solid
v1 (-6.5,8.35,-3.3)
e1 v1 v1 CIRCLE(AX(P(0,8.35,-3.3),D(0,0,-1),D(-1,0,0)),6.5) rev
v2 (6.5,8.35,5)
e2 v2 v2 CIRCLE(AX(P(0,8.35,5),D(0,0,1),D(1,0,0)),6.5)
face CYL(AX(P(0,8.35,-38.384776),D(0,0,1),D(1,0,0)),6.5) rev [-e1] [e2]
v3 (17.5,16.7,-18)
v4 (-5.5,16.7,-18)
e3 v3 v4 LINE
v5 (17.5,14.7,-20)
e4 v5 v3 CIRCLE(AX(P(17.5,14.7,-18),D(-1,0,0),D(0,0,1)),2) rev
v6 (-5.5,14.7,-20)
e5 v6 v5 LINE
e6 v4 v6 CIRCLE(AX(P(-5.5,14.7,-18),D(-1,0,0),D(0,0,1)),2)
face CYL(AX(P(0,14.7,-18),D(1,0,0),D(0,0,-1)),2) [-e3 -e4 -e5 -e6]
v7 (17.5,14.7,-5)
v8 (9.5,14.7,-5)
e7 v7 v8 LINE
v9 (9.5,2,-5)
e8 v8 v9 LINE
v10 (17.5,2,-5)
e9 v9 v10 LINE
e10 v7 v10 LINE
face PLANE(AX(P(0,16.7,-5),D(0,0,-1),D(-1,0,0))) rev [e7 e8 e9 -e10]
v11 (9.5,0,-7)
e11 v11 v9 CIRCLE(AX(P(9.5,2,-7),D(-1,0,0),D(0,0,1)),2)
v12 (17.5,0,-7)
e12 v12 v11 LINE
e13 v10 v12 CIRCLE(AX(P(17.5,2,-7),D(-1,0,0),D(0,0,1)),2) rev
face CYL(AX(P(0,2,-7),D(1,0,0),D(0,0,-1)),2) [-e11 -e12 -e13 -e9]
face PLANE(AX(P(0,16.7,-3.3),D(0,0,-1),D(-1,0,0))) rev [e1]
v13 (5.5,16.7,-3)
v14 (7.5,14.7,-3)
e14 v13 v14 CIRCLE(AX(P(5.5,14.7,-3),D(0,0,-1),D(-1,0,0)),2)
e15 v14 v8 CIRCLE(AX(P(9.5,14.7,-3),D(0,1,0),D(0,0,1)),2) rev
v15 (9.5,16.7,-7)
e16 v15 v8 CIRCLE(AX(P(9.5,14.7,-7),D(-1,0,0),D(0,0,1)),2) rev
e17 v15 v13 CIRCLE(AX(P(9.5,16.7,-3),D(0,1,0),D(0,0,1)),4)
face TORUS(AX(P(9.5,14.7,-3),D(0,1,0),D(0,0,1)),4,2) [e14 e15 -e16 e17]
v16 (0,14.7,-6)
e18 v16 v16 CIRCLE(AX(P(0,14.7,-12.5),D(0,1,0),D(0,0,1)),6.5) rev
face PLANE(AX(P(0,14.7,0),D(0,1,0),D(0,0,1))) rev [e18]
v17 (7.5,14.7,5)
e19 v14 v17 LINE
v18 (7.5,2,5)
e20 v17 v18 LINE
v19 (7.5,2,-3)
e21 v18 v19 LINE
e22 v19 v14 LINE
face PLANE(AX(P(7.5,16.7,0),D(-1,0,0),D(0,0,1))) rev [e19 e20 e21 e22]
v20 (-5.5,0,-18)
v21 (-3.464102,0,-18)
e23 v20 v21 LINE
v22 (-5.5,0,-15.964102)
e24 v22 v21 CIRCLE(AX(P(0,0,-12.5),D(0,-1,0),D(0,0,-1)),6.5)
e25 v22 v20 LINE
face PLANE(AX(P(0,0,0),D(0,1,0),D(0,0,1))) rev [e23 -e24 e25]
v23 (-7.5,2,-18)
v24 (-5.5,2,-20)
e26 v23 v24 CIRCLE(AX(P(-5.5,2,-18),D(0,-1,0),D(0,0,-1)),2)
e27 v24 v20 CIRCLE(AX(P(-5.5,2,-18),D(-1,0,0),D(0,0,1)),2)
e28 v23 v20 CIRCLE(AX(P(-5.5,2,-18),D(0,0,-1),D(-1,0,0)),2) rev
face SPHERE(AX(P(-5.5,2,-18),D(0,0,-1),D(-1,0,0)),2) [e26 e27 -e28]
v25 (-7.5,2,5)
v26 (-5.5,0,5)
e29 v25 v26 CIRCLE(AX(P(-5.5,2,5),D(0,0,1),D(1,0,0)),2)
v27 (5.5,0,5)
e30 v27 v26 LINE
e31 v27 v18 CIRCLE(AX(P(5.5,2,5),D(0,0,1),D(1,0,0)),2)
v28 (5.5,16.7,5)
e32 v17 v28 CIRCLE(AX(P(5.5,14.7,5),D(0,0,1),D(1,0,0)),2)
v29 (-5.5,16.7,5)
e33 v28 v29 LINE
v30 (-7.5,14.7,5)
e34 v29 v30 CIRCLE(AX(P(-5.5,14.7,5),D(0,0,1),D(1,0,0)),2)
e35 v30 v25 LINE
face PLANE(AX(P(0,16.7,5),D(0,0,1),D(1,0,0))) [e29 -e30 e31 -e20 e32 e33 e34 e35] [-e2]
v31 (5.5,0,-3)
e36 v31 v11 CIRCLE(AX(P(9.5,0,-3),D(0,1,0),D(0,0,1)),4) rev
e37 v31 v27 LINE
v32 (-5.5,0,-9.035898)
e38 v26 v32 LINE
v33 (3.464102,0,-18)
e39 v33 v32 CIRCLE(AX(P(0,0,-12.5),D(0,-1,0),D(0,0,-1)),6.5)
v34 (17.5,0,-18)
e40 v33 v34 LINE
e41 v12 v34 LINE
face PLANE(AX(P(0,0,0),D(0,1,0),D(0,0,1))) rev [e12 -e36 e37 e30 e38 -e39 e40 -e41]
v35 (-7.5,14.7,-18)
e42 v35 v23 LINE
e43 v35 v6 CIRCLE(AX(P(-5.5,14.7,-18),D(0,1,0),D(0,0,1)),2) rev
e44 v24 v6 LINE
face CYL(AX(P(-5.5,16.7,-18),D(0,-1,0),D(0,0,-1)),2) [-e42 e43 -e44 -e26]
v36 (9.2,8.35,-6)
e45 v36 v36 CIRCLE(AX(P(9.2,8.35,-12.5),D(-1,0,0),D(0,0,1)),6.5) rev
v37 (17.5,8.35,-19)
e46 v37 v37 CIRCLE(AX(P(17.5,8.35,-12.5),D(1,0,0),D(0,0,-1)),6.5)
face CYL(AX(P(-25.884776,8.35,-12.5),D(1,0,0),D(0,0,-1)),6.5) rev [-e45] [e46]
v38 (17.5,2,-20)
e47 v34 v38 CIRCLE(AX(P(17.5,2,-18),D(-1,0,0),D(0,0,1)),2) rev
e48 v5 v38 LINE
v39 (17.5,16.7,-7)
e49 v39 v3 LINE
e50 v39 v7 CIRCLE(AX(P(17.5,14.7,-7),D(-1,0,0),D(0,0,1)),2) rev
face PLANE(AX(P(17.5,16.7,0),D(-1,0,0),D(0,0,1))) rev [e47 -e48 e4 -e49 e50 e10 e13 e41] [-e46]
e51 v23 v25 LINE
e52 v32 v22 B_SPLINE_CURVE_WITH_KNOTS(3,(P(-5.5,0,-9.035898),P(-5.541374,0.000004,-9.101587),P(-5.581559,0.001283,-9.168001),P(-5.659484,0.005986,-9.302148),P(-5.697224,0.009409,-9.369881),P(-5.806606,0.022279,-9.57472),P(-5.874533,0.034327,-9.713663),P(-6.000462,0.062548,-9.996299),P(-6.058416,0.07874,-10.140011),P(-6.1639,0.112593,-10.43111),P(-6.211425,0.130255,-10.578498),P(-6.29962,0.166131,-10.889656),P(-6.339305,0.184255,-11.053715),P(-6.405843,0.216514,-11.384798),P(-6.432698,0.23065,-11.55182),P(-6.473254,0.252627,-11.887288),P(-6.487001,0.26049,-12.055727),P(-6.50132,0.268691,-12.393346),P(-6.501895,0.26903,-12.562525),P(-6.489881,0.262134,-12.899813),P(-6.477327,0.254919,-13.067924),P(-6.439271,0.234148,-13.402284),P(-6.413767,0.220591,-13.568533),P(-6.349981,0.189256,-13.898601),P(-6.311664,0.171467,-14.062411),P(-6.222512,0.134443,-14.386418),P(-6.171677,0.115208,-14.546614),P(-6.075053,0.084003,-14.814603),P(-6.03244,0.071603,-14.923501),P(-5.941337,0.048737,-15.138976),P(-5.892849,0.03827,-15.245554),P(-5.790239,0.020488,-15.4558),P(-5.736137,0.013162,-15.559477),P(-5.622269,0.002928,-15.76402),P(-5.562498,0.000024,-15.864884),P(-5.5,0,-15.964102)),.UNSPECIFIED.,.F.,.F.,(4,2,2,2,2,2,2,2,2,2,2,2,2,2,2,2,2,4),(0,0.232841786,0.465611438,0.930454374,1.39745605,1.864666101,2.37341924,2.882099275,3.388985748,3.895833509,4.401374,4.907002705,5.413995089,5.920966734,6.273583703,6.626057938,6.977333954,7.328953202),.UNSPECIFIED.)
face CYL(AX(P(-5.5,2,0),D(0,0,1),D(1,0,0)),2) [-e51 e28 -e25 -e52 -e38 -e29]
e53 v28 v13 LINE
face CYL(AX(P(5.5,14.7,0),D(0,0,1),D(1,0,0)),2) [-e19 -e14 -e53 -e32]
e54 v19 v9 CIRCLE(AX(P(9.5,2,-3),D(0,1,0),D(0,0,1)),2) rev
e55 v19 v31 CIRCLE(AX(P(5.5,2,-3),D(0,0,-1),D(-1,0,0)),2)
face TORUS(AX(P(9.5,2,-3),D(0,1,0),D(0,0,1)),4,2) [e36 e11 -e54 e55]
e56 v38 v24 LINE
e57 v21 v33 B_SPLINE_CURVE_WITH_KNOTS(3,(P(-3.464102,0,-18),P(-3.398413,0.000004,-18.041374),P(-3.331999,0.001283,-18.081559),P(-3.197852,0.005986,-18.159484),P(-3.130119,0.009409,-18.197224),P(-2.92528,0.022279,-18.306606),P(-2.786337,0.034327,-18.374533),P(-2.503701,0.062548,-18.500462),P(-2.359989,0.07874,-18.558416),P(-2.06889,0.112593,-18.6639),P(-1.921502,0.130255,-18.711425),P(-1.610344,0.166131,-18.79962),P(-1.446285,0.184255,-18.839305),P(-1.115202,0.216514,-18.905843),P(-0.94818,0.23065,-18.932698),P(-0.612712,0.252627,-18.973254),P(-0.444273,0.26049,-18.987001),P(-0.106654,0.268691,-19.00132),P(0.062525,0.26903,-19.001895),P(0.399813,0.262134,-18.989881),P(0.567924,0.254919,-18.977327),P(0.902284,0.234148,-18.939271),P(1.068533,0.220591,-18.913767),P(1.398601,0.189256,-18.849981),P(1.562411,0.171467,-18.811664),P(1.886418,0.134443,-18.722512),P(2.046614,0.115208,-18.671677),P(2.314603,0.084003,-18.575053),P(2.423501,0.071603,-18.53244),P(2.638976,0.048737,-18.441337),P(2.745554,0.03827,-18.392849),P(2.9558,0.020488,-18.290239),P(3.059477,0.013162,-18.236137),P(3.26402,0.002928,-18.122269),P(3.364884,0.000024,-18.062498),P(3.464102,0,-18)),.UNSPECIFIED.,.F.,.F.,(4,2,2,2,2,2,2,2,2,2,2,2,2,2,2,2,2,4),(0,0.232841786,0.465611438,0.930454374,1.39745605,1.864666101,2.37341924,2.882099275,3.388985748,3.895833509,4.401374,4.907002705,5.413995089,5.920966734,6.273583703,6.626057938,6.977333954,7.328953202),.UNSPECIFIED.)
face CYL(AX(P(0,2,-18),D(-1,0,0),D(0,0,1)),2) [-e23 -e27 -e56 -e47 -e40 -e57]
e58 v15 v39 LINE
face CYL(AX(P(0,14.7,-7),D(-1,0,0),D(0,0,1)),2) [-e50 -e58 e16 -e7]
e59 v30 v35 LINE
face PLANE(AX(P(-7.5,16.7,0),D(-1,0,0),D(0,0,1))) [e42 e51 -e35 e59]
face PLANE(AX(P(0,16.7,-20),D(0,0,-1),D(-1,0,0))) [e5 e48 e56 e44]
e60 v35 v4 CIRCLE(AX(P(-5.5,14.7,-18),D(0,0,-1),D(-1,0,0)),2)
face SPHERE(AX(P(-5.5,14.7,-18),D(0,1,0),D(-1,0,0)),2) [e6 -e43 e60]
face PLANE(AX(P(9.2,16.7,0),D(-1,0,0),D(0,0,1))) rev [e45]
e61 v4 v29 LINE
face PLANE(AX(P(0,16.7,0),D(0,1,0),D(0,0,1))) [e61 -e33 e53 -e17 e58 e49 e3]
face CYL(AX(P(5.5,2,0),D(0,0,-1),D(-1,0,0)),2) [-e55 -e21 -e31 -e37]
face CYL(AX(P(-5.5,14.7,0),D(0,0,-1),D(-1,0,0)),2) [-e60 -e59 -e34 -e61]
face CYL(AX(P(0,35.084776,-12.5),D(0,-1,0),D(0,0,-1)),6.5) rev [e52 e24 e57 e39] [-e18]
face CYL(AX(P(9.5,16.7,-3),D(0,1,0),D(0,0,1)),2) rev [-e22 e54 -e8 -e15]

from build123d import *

# Parameters (mm, degrees)
SKETCH1_W           = 15
SKETCH1_H           = 10
SKETCH1_H_2         = 15
SKETCH1_W_2         = 10
BOSS_EXTRUDE1_DEPTH = 16.7
SKETCH2_R           = 6.5
CUT_EXTRUDE1_DEPTH  = 8.3
SKETCH3_R           = 6.5
CUT_EXTRUDE2_DEPTH  = 8.3
SKETCH4_R           = 6.5
CUT_EXTRUDE3_DEPTH  = 14.7
FILLET8_R           = 2


with BuildPart() as part:
    # Sketch1 → Boss-Extrude1 (new body)
    with BuildSketch(Plane(origin=(0, 0, 0), x_dir=(1, 0, 0), z_dir=(0, 1, 0))):
        Rectangle(SKETCH1_W, SKETCH1_H)
        with Locations((0, 12.5)):
            Rectangle(SKETCH1_W, SKETCH1_H_2)
        with Locations((12.5, 12.5)):
            Rectangle(SKETCH1_W_2, SKETCH1_H_2)
    extrude(amount=BOSS_EXTRUDE1_DEPTH)

    # Sketch2 → Cut-Extrude1 (cut)
    with BuildSketch(Plane.XY.offset(5)):
        with Locations((0, 8.35)):
            Circle(SKETCH2_R)
    extrude(amount=-CUT_EXTRUDE1_DEPTH, mode=Mode.SUBTRACT)

    # Sketch3 → Cut-Extrude2 (cut)
    with BuildSketch(Plane(origin=(17.5, 0, 0), x_dir=(0, 0, -1), z_dir=(1, 0, 0))):
        with Locations((12.5, 8.35)):
            Circle(SKETCH3_R)
    extrude(amount=-CUT_EXTRUDE2_DEPTH, mode=Mode.SUBTRACT)

    # Sketch4 → Cut-Extrude3 (cut)
    with BuildSketch(Plane.XZ):
        with Locations(Location((0, -12.5, 0), (0, 0, 270))):
            Circle(SKETCH4_R)
    extrude(amount=-CUT_EXTRUDE3_DEPTH, mode=Mode.SUBTRACT)

    # Fillet8
    # the kernel refuses this fillet: 2 mm, written as the material it adds along each edge
    with BuildSketch(Plane(origin=(7.5, 0, -5), x_dir=(0, 0, 1), z_dir=(0, 1, 0))) as fillet8_piece_1:
        with BuildLine():
            CenterArc((FILLET8_R, FILLET8_R), FILLET8_R, 180, 90)
            Line((0, FILLET8_R), (0, 0))
            Line((0, 0), (FILLET8_R, 0))
        make_face()
    extrude(amount=16.7)
    # the kernel refuses this fillet: 2 mm, written as the material it takes off along each edge
    with BuildSketch(Plane(origin=(-5.5, 2, -18), x_dir=(0, 0, -1), z_dir=(-1, 0, 0))) as fillet8_2_piece_1_section:
        Polygon((0, 0), (FILLET8_R, 0), (FILLET8_R, FILLET8_R), (0, FILLET8_R), align=None)
    fillet8_2_piece_1 = extrude(amount=FILLET8_R, mode=Mode.PRIVATE)
    fillet8_2_piece_1 = fillet8_2_piece_1 - Plane(origin=(-5.5, 2, -18), x_dir=(0, 0.7071067811865475, 0.7071067811865475), z_dir=(-1, 0, 0)) * Sphere(FILLET8_R, mode=Mode.PRIVATE)
    add(fillet8_2_piece_1, mode=Mode.SUBTRACT)
    with BuildSketch(Plane(origin=(-5.5, 14.7, -18), x_dir=(0, 1, 0), z_dir=(-1, 0, 0))) as fillet8_2_piece_2_section:
        Polygon((0, 0), (FILLET8_R, 0), (FILLET8_R, FILLET8_R), (0, FILLET8_R), align=None)
    fillet8_2_piece_2 = extrude(amount=FILLET8_R, mode=Mode.PRIVATE)
    fillet8_2_piece_2 = fillet8_2_piece_2 - Plane(origin=(-5.5, 14.7, -18), x_dir=(0, -0.7071067811865475, 0.7071067811865475), z_dir=(-1, 0, 0)) * Sphere(FILLET8_R, mode=Mode.PRIVATE)
    add(fillet8_2_piece_2, mode=Mode.SUBTRACT)
    with BuildSketch(Plane(origin=(-7.5, 0, -18), x_dir=(0, 1, 0), z_dir=(0, 0, 1)), Plane(origin=(22.5, 16.7, -20), x_dir=(0, 0, 1), z_dir=(-1, 0, 0)), Plane(origin=(-7.5, 16.7, 10), x_dir=(0, -1, 0), z_dir=(0, 0, -1)), Plane(origin=(22.5, 0, -20), x_dir=(0, 1, 0), z_dir=(-1, 0, 0))) as fillet8_2_piece_3:
        with BuildLine():
            CenterArc((FILLET8_R, -FILLET8_R), FILLET8_R, 90, 90)
            Line((0, -FILLET8_R), (0, 0))
            Line((0, 0), (FILLET8_R, 0))
        make_face()
    extrude(amount=28, mode=Mode.SUBTRACT)
    with BuildSketch(Plane(origin=(-7.5, 2, -20), x_dir=(0, 0, 1), z_dir=(0, 1, 0))) as fillet8_2_piece_4:
        with BuildLine():
            CenterArc((FILLET8_R, FILLET8_R), FILLET8_R, 180, 90)
            Line((0, FILLET8_R), (0, 0))
            Line((0, 0), (FILLET8_R, 0))
        make_face()
    extrude(amount=12.7, mode=Mode.SUBTRACT)
    # the kernel refuses this fillet: 2 mm, written as the material it takes off along each edge
    with BuildSketch(Plane(origin=(7.5, 16.7, 10), x_dir=(-1, 0, 0), z_dir=(0, 0, -1)), Plane(origin=(9.5, 16.7, -5), x_dir=(0, 0, -1), z_dir=(1, 0, 0)), Plane(origin=(7.5, 0, -3), x_dir=(-1, 0, 0), z_dir=(0, 0, 1))) as fillet8_3_piece_1:
        with BuildLine():
            CenterArc((FILLET8_R, -FILLET8_R), FILLET8_R, 90, 90)
            Line((0, -FILLET8_R), (0, 0))
            Line((0, 0), (FILLET8_R, 0))
        make_face()
    extrude(amount=13, mode=Mode.SUBTRACT)
    with BuildSketch(Plane(origin=(9.5, 0, -5), x_dir=(0, 0, -1), z_dir=(1, 0, 0))) as fillet8_3_piece_2:
        with BuildLine():
            CenterArc((FILLET8_R, FILLET8_R), FILLET8_R, 180, 90)
            Line((0, FILLET8_R), (0, 0))
            Line((0, 0), (FILLET8_R, 0))
        make_face()
    extrude(amount=13, mode=Mode.SUBTRACT)
    with BuildSketch(Plane(origin=(9.5, 0, -3), x_dir=(-1, 0, 0), z_dir=(0, 0, 1))) as fillet8_3_piece_3:
        with BuildLine():
            CenterArc((2 + FILLET8_R, -FILLET8_R), FILLET8_R, 90, 90)
            Line((2, -FILLET8_R), (2, 0))
            Line((2, 0), (2 + FILLET8_R, 0))
        make_face()
    revolve(axis=Axis((9.5, 0, -3), (0, -1, 0)), revolution_arc=90, mode=Mode.SUBTRACT)
    with BuildSketch(Plane(origin=(9.5, 16.7, -3), x_dir=(-1, 0, 0), z_dir=(0, 0, 1))) as fillet8_3_piece_4:
        with BuildLine():
            CenterArc((2 + FILLET8_R, FILLET8_R), FILLET8_R, 180, 90)
            Line((2, FILLET8_R), (2, 0))
            Line((2, 0), (2 + FILLET8_R, 0))
        make_face()
    revolve(axis=Axis((9.5, 16.7, -3), (0, -1, 0)), revolution_arc=90, mode=Mode.SUBTRACT)


solid = part.part
